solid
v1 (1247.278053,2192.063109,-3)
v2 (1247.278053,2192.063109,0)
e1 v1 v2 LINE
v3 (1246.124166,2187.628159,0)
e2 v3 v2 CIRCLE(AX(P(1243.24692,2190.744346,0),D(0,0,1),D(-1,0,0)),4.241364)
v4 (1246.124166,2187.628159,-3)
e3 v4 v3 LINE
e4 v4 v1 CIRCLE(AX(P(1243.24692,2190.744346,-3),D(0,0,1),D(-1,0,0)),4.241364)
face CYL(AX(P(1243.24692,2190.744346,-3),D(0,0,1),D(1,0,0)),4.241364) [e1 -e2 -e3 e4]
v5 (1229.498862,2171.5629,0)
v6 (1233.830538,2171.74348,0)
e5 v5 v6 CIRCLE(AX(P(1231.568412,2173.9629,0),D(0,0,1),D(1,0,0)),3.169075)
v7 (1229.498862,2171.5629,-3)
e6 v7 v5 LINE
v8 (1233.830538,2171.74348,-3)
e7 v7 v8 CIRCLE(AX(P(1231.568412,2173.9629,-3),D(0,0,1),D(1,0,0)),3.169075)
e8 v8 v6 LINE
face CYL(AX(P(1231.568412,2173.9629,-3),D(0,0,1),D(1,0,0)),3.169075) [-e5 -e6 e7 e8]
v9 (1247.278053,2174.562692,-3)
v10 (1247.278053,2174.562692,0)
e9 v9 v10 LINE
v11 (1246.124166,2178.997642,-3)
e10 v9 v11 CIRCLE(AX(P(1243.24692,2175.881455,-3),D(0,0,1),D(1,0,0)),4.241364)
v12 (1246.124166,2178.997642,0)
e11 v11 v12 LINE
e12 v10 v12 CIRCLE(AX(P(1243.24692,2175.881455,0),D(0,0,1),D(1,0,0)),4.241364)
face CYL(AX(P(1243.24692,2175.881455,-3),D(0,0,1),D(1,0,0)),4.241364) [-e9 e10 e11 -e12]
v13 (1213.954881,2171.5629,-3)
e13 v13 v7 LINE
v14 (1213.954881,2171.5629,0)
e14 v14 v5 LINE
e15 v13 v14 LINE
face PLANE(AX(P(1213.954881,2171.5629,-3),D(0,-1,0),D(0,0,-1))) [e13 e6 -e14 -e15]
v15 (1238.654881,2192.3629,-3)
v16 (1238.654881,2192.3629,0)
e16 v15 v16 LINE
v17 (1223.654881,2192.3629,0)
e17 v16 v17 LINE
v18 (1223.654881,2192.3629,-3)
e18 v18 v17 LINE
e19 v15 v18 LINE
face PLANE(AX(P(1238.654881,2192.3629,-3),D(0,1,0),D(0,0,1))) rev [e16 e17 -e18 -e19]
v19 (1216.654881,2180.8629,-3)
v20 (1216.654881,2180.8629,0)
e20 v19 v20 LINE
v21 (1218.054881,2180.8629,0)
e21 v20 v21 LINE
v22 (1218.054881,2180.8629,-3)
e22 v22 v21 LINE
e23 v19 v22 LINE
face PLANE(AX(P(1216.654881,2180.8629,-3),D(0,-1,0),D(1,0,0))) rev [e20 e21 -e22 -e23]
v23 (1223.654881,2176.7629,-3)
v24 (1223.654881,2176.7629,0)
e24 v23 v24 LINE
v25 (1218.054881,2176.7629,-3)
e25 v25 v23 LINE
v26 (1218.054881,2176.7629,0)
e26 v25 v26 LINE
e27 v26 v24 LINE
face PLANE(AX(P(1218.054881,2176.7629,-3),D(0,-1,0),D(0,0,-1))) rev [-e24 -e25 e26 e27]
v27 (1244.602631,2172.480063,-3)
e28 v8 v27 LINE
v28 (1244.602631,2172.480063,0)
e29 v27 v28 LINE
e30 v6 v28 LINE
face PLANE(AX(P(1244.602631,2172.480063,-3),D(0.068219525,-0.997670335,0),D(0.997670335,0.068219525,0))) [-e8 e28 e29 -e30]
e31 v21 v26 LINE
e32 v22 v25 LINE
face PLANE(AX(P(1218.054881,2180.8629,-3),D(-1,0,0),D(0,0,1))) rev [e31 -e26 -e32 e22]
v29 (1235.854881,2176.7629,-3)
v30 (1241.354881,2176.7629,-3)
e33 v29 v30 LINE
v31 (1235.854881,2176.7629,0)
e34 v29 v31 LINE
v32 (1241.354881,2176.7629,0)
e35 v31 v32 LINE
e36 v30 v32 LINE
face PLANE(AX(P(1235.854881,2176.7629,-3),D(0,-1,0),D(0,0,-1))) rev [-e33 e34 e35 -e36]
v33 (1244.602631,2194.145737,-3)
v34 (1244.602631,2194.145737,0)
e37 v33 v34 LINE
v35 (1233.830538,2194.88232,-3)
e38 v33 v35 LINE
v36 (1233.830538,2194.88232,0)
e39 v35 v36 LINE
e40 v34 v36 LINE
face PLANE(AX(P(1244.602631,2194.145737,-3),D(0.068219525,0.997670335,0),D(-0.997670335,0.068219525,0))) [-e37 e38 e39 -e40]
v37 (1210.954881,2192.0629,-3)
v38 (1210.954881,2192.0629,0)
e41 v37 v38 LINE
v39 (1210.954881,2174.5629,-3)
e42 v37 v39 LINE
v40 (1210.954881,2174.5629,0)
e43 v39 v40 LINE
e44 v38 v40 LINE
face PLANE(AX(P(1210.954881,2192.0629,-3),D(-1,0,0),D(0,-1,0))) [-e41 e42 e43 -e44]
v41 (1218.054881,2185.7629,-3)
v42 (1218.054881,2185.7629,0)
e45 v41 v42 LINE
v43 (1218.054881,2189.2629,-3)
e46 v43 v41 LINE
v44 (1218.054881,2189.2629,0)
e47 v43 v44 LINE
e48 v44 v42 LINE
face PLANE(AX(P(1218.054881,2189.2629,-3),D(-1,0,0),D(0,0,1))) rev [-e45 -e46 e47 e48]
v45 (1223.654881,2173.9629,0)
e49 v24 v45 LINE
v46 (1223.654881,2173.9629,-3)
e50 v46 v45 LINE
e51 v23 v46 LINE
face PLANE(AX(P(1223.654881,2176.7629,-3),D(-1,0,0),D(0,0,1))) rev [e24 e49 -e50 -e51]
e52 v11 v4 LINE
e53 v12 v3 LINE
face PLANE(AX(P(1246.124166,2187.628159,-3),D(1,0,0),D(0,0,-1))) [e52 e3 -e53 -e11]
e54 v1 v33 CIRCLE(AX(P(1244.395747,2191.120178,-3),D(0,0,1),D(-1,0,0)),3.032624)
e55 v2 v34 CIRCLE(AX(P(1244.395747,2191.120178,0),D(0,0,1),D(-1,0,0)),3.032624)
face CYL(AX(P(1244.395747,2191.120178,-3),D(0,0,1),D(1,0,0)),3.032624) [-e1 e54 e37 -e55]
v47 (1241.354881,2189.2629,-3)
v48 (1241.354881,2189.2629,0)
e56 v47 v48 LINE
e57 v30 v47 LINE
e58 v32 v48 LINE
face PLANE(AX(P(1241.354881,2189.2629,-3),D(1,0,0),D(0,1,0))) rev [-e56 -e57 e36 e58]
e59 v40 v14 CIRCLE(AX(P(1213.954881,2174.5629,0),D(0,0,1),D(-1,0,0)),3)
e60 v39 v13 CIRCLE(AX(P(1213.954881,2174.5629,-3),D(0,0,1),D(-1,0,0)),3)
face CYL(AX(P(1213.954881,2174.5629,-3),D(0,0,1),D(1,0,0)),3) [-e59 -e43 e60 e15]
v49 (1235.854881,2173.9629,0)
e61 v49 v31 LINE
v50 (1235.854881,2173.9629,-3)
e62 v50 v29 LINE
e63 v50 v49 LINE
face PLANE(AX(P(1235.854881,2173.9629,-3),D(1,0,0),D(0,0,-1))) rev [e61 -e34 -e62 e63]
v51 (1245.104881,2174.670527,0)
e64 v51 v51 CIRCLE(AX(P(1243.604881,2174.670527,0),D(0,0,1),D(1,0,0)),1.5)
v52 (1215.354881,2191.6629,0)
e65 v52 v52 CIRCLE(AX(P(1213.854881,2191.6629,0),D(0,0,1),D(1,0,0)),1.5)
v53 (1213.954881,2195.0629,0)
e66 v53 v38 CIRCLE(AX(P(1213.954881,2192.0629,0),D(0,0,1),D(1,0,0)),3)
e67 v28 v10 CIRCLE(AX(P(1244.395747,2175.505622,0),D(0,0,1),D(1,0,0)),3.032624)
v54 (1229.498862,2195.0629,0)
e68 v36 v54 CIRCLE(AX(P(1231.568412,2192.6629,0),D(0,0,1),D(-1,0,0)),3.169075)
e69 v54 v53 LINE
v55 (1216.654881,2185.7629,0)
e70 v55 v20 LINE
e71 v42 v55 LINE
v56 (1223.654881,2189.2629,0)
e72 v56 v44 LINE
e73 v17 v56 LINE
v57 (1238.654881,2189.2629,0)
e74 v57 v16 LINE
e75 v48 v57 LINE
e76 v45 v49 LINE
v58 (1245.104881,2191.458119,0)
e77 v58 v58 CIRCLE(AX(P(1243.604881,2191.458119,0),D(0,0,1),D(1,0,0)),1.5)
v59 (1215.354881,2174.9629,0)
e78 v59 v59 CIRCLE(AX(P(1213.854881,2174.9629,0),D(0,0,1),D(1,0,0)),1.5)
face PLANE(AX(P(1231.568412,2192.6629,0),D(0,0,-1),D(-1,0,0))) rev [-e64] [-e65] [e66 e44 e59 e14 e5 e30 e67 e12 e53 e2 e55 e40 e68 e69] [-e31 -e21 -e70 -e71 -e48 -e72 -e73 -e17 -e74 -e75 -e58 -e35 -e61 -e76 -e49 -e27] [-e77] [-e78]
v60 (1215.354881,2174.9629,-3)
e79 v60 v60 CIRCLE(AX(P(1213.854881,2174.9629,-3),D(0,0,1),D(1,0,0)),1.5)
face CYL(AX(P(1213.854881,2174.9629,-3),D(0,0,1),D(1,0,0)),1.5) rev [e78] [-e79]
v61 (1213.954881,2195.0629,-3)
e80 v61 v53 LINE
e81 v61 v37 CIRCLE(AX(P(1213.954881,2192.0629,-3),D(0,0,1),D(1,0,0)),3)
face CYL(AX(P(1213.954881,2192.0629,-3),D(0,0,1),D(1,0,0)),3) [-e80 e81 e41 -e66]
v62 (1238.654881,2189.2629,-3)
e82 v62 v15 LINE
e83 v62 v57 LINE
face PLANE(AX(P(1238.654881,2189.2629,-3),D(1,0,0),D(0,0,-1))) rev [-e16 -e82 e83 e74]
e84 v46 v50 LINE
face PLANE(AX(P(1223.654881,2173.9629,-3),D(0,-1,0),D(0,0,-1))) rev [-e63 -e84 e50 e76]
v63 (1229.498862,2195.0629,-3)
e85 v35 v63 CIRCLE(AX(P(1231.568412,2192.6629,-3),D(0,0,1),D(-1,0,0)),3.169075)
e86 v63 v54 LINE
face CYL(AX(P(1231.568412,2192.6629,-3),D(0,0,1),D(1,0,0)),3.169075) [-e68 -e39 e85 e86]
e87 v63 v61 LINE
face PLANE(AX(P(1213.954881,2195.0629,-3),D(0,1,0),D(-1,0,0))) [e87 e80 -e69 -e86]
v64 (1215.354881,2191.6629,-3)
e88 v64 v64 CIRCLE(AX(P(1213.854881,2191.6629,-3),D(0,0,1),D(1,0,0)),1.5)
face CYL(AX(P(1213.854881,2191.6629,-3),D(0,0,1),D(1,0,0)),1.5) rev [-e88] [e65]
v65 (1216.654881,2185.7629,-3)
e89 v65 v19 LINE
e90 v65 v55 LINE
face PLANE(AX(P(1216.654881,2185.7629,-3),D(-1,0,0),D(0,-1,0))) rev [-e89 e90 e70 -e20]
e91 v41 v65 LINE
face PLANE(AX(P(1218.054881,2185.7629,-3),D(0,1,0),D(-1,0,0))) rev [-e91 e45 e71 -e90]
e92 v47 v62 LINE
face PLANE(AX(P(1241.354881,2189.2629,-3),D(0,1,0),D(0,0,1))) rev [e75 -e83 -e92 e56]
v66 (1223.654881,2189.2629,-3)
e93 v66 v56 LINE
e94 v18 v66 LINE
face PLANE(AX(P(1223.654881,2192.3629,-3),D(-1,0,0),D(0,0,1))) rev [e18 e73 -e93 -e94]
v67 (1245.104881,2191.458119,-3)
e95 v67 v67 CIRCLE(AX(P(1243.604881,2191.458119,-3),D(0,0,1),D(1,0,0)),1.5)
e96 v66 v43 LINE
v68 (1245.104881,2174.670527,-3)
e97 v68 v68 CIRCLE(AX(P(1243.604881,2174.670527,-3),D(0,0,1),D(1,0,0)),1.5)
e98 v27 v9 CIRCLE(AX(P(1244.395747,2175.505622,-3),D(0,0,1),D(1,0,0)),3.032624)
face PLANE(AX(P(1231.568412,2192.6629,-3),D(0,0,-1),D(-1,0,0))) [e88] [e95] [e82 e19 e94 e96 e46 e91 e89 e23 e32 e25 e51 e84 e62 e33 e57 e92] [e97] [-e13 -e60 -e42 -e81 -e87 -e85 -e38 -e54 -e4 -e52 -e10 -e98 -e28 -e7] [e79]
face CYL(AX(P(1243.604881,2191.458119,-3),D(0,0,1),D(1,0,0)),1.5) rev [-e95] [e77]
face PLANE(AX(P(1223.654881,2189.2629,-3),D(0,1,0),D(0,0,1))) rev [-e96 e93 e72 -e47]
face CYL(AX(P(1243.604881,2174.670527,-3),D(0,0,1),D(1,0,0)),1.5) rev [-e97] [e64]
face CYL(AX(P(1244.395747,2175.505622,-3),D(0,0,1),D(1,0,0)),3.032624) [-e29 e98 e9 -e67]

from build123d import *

# Parameters (mm, degrees)
ESQUISSE1_R               = 1.5
T_LE_DE_BASE_PLI_E1_DEPTH = 3


# Sheet-metal steps are written as plain solids
with BuildPart() as part:
    # Esquisse1 → Tôle de base pliée1 (new body)
    with BuildSketch(Plane.XY):
        with BuildLine():
            Line((1210.954881098, 2192.062900441), (1210.954881098, 2174.562900441))
            ThreePointArc((1210.954881098, 2174.562900441), (1211.833560754, 2172.441580098), (1213.954881098, 2171.562900441))
            Line((1213.954881098, 2171.562900441), (1229.498862267, 2171.562900441))
            ThreePointArc((1229.498862267, 2171.562900441), (1231.700410864, 2170.796575468), (1233.830537909, 2171.743480404))
            Line((1233.830537909, 2171.743480404), (1244.602630734, 2172.48006345))
            ThreePointArc((1244.602630734, 2172.48006345), (1246.258569693, 2173.112570346), (1247.278053022, 2174.56269191))
            ThreePointArc((1247.278053022, 2174.56269191), (1247.351627268, 2176.949418696), (1246.12416641, 2178.997641771))
            Line((1246.12416641, 2178.997641771), (1246.12416641, 2187.628159112))
            ThreePointArc((1246.12416641, 2187.628159112), (1247.351627268, 2189.676382187), (1247.278053022, 2192.063108973))
            ThreePointArc((1247.278053022, 2192.063108973), (1246.258569693, 2193.513230537), (1244.602630734, 2194.145737433))
            Line((1244.602630734, 2194.145737433), (1233.830537909, 2194.882320479))
            ThreePointArc((1233.830537909, 2194.882320479), (1231.700410864, 2195.829225415), (1229.498862267, 2195.062900441))
            Line((1229.498862267, 2195.062900441), (1213.954881098, 2195.062900441))
            ThreePointArc((1213.954881098, 2195.062900441), (1211.833560754, 2194.184220785), (1210.954881098, 2192.062900441))
        make_face()
        with Locations((1243.604881098, 2191.458119207)):
            Circle(ESQUISSE1_R, mode=Mode.SUBTRACT)
        with Locations((1213.854881098, 2191.662900441)):
            Circle(ESQUISSE1_R, mode=Mode.SUBTRACT)
        with Locations((1213.854881098, 2174.962900441)):
            Circle(ESQUISSE1_R, mode=Mode.SUBTRACT)
        with Locations((1243.604881098, 2174.670527055)):
            Circle(ESQUISSE1_R, mode=Mode.SUBTRACT)
        Polygon((1241.354881098, 2189.262900441), (1241.354881098, 2176.762900441), (1235.854881098, 2176.762900441), (1235.854881098, 2173.962900441), (1223.654881098, 2173.962900441), (1223.654881098, 2176.762900441), (1218.054881098, 2176.762900441), (1218.054881098, 2180.862900441), (1216.654881098, 2180.862900441), (1216.654881098, 2185.762900441), (1218.054881098, 2185.762900441), (1218.054881098, 2189.262900441), (1223.654881098, 2189.262900441), (1223.654881098, 2192.362900441), (1238.654881098, 2192.362900441), (1238.654881098, 2189.262900441), align=None, mode=Mode.SUBTRACT)
    extrude(amount=-T_LE_DE_BASE_PLI_E1_DEPTH)


solid = part.part
